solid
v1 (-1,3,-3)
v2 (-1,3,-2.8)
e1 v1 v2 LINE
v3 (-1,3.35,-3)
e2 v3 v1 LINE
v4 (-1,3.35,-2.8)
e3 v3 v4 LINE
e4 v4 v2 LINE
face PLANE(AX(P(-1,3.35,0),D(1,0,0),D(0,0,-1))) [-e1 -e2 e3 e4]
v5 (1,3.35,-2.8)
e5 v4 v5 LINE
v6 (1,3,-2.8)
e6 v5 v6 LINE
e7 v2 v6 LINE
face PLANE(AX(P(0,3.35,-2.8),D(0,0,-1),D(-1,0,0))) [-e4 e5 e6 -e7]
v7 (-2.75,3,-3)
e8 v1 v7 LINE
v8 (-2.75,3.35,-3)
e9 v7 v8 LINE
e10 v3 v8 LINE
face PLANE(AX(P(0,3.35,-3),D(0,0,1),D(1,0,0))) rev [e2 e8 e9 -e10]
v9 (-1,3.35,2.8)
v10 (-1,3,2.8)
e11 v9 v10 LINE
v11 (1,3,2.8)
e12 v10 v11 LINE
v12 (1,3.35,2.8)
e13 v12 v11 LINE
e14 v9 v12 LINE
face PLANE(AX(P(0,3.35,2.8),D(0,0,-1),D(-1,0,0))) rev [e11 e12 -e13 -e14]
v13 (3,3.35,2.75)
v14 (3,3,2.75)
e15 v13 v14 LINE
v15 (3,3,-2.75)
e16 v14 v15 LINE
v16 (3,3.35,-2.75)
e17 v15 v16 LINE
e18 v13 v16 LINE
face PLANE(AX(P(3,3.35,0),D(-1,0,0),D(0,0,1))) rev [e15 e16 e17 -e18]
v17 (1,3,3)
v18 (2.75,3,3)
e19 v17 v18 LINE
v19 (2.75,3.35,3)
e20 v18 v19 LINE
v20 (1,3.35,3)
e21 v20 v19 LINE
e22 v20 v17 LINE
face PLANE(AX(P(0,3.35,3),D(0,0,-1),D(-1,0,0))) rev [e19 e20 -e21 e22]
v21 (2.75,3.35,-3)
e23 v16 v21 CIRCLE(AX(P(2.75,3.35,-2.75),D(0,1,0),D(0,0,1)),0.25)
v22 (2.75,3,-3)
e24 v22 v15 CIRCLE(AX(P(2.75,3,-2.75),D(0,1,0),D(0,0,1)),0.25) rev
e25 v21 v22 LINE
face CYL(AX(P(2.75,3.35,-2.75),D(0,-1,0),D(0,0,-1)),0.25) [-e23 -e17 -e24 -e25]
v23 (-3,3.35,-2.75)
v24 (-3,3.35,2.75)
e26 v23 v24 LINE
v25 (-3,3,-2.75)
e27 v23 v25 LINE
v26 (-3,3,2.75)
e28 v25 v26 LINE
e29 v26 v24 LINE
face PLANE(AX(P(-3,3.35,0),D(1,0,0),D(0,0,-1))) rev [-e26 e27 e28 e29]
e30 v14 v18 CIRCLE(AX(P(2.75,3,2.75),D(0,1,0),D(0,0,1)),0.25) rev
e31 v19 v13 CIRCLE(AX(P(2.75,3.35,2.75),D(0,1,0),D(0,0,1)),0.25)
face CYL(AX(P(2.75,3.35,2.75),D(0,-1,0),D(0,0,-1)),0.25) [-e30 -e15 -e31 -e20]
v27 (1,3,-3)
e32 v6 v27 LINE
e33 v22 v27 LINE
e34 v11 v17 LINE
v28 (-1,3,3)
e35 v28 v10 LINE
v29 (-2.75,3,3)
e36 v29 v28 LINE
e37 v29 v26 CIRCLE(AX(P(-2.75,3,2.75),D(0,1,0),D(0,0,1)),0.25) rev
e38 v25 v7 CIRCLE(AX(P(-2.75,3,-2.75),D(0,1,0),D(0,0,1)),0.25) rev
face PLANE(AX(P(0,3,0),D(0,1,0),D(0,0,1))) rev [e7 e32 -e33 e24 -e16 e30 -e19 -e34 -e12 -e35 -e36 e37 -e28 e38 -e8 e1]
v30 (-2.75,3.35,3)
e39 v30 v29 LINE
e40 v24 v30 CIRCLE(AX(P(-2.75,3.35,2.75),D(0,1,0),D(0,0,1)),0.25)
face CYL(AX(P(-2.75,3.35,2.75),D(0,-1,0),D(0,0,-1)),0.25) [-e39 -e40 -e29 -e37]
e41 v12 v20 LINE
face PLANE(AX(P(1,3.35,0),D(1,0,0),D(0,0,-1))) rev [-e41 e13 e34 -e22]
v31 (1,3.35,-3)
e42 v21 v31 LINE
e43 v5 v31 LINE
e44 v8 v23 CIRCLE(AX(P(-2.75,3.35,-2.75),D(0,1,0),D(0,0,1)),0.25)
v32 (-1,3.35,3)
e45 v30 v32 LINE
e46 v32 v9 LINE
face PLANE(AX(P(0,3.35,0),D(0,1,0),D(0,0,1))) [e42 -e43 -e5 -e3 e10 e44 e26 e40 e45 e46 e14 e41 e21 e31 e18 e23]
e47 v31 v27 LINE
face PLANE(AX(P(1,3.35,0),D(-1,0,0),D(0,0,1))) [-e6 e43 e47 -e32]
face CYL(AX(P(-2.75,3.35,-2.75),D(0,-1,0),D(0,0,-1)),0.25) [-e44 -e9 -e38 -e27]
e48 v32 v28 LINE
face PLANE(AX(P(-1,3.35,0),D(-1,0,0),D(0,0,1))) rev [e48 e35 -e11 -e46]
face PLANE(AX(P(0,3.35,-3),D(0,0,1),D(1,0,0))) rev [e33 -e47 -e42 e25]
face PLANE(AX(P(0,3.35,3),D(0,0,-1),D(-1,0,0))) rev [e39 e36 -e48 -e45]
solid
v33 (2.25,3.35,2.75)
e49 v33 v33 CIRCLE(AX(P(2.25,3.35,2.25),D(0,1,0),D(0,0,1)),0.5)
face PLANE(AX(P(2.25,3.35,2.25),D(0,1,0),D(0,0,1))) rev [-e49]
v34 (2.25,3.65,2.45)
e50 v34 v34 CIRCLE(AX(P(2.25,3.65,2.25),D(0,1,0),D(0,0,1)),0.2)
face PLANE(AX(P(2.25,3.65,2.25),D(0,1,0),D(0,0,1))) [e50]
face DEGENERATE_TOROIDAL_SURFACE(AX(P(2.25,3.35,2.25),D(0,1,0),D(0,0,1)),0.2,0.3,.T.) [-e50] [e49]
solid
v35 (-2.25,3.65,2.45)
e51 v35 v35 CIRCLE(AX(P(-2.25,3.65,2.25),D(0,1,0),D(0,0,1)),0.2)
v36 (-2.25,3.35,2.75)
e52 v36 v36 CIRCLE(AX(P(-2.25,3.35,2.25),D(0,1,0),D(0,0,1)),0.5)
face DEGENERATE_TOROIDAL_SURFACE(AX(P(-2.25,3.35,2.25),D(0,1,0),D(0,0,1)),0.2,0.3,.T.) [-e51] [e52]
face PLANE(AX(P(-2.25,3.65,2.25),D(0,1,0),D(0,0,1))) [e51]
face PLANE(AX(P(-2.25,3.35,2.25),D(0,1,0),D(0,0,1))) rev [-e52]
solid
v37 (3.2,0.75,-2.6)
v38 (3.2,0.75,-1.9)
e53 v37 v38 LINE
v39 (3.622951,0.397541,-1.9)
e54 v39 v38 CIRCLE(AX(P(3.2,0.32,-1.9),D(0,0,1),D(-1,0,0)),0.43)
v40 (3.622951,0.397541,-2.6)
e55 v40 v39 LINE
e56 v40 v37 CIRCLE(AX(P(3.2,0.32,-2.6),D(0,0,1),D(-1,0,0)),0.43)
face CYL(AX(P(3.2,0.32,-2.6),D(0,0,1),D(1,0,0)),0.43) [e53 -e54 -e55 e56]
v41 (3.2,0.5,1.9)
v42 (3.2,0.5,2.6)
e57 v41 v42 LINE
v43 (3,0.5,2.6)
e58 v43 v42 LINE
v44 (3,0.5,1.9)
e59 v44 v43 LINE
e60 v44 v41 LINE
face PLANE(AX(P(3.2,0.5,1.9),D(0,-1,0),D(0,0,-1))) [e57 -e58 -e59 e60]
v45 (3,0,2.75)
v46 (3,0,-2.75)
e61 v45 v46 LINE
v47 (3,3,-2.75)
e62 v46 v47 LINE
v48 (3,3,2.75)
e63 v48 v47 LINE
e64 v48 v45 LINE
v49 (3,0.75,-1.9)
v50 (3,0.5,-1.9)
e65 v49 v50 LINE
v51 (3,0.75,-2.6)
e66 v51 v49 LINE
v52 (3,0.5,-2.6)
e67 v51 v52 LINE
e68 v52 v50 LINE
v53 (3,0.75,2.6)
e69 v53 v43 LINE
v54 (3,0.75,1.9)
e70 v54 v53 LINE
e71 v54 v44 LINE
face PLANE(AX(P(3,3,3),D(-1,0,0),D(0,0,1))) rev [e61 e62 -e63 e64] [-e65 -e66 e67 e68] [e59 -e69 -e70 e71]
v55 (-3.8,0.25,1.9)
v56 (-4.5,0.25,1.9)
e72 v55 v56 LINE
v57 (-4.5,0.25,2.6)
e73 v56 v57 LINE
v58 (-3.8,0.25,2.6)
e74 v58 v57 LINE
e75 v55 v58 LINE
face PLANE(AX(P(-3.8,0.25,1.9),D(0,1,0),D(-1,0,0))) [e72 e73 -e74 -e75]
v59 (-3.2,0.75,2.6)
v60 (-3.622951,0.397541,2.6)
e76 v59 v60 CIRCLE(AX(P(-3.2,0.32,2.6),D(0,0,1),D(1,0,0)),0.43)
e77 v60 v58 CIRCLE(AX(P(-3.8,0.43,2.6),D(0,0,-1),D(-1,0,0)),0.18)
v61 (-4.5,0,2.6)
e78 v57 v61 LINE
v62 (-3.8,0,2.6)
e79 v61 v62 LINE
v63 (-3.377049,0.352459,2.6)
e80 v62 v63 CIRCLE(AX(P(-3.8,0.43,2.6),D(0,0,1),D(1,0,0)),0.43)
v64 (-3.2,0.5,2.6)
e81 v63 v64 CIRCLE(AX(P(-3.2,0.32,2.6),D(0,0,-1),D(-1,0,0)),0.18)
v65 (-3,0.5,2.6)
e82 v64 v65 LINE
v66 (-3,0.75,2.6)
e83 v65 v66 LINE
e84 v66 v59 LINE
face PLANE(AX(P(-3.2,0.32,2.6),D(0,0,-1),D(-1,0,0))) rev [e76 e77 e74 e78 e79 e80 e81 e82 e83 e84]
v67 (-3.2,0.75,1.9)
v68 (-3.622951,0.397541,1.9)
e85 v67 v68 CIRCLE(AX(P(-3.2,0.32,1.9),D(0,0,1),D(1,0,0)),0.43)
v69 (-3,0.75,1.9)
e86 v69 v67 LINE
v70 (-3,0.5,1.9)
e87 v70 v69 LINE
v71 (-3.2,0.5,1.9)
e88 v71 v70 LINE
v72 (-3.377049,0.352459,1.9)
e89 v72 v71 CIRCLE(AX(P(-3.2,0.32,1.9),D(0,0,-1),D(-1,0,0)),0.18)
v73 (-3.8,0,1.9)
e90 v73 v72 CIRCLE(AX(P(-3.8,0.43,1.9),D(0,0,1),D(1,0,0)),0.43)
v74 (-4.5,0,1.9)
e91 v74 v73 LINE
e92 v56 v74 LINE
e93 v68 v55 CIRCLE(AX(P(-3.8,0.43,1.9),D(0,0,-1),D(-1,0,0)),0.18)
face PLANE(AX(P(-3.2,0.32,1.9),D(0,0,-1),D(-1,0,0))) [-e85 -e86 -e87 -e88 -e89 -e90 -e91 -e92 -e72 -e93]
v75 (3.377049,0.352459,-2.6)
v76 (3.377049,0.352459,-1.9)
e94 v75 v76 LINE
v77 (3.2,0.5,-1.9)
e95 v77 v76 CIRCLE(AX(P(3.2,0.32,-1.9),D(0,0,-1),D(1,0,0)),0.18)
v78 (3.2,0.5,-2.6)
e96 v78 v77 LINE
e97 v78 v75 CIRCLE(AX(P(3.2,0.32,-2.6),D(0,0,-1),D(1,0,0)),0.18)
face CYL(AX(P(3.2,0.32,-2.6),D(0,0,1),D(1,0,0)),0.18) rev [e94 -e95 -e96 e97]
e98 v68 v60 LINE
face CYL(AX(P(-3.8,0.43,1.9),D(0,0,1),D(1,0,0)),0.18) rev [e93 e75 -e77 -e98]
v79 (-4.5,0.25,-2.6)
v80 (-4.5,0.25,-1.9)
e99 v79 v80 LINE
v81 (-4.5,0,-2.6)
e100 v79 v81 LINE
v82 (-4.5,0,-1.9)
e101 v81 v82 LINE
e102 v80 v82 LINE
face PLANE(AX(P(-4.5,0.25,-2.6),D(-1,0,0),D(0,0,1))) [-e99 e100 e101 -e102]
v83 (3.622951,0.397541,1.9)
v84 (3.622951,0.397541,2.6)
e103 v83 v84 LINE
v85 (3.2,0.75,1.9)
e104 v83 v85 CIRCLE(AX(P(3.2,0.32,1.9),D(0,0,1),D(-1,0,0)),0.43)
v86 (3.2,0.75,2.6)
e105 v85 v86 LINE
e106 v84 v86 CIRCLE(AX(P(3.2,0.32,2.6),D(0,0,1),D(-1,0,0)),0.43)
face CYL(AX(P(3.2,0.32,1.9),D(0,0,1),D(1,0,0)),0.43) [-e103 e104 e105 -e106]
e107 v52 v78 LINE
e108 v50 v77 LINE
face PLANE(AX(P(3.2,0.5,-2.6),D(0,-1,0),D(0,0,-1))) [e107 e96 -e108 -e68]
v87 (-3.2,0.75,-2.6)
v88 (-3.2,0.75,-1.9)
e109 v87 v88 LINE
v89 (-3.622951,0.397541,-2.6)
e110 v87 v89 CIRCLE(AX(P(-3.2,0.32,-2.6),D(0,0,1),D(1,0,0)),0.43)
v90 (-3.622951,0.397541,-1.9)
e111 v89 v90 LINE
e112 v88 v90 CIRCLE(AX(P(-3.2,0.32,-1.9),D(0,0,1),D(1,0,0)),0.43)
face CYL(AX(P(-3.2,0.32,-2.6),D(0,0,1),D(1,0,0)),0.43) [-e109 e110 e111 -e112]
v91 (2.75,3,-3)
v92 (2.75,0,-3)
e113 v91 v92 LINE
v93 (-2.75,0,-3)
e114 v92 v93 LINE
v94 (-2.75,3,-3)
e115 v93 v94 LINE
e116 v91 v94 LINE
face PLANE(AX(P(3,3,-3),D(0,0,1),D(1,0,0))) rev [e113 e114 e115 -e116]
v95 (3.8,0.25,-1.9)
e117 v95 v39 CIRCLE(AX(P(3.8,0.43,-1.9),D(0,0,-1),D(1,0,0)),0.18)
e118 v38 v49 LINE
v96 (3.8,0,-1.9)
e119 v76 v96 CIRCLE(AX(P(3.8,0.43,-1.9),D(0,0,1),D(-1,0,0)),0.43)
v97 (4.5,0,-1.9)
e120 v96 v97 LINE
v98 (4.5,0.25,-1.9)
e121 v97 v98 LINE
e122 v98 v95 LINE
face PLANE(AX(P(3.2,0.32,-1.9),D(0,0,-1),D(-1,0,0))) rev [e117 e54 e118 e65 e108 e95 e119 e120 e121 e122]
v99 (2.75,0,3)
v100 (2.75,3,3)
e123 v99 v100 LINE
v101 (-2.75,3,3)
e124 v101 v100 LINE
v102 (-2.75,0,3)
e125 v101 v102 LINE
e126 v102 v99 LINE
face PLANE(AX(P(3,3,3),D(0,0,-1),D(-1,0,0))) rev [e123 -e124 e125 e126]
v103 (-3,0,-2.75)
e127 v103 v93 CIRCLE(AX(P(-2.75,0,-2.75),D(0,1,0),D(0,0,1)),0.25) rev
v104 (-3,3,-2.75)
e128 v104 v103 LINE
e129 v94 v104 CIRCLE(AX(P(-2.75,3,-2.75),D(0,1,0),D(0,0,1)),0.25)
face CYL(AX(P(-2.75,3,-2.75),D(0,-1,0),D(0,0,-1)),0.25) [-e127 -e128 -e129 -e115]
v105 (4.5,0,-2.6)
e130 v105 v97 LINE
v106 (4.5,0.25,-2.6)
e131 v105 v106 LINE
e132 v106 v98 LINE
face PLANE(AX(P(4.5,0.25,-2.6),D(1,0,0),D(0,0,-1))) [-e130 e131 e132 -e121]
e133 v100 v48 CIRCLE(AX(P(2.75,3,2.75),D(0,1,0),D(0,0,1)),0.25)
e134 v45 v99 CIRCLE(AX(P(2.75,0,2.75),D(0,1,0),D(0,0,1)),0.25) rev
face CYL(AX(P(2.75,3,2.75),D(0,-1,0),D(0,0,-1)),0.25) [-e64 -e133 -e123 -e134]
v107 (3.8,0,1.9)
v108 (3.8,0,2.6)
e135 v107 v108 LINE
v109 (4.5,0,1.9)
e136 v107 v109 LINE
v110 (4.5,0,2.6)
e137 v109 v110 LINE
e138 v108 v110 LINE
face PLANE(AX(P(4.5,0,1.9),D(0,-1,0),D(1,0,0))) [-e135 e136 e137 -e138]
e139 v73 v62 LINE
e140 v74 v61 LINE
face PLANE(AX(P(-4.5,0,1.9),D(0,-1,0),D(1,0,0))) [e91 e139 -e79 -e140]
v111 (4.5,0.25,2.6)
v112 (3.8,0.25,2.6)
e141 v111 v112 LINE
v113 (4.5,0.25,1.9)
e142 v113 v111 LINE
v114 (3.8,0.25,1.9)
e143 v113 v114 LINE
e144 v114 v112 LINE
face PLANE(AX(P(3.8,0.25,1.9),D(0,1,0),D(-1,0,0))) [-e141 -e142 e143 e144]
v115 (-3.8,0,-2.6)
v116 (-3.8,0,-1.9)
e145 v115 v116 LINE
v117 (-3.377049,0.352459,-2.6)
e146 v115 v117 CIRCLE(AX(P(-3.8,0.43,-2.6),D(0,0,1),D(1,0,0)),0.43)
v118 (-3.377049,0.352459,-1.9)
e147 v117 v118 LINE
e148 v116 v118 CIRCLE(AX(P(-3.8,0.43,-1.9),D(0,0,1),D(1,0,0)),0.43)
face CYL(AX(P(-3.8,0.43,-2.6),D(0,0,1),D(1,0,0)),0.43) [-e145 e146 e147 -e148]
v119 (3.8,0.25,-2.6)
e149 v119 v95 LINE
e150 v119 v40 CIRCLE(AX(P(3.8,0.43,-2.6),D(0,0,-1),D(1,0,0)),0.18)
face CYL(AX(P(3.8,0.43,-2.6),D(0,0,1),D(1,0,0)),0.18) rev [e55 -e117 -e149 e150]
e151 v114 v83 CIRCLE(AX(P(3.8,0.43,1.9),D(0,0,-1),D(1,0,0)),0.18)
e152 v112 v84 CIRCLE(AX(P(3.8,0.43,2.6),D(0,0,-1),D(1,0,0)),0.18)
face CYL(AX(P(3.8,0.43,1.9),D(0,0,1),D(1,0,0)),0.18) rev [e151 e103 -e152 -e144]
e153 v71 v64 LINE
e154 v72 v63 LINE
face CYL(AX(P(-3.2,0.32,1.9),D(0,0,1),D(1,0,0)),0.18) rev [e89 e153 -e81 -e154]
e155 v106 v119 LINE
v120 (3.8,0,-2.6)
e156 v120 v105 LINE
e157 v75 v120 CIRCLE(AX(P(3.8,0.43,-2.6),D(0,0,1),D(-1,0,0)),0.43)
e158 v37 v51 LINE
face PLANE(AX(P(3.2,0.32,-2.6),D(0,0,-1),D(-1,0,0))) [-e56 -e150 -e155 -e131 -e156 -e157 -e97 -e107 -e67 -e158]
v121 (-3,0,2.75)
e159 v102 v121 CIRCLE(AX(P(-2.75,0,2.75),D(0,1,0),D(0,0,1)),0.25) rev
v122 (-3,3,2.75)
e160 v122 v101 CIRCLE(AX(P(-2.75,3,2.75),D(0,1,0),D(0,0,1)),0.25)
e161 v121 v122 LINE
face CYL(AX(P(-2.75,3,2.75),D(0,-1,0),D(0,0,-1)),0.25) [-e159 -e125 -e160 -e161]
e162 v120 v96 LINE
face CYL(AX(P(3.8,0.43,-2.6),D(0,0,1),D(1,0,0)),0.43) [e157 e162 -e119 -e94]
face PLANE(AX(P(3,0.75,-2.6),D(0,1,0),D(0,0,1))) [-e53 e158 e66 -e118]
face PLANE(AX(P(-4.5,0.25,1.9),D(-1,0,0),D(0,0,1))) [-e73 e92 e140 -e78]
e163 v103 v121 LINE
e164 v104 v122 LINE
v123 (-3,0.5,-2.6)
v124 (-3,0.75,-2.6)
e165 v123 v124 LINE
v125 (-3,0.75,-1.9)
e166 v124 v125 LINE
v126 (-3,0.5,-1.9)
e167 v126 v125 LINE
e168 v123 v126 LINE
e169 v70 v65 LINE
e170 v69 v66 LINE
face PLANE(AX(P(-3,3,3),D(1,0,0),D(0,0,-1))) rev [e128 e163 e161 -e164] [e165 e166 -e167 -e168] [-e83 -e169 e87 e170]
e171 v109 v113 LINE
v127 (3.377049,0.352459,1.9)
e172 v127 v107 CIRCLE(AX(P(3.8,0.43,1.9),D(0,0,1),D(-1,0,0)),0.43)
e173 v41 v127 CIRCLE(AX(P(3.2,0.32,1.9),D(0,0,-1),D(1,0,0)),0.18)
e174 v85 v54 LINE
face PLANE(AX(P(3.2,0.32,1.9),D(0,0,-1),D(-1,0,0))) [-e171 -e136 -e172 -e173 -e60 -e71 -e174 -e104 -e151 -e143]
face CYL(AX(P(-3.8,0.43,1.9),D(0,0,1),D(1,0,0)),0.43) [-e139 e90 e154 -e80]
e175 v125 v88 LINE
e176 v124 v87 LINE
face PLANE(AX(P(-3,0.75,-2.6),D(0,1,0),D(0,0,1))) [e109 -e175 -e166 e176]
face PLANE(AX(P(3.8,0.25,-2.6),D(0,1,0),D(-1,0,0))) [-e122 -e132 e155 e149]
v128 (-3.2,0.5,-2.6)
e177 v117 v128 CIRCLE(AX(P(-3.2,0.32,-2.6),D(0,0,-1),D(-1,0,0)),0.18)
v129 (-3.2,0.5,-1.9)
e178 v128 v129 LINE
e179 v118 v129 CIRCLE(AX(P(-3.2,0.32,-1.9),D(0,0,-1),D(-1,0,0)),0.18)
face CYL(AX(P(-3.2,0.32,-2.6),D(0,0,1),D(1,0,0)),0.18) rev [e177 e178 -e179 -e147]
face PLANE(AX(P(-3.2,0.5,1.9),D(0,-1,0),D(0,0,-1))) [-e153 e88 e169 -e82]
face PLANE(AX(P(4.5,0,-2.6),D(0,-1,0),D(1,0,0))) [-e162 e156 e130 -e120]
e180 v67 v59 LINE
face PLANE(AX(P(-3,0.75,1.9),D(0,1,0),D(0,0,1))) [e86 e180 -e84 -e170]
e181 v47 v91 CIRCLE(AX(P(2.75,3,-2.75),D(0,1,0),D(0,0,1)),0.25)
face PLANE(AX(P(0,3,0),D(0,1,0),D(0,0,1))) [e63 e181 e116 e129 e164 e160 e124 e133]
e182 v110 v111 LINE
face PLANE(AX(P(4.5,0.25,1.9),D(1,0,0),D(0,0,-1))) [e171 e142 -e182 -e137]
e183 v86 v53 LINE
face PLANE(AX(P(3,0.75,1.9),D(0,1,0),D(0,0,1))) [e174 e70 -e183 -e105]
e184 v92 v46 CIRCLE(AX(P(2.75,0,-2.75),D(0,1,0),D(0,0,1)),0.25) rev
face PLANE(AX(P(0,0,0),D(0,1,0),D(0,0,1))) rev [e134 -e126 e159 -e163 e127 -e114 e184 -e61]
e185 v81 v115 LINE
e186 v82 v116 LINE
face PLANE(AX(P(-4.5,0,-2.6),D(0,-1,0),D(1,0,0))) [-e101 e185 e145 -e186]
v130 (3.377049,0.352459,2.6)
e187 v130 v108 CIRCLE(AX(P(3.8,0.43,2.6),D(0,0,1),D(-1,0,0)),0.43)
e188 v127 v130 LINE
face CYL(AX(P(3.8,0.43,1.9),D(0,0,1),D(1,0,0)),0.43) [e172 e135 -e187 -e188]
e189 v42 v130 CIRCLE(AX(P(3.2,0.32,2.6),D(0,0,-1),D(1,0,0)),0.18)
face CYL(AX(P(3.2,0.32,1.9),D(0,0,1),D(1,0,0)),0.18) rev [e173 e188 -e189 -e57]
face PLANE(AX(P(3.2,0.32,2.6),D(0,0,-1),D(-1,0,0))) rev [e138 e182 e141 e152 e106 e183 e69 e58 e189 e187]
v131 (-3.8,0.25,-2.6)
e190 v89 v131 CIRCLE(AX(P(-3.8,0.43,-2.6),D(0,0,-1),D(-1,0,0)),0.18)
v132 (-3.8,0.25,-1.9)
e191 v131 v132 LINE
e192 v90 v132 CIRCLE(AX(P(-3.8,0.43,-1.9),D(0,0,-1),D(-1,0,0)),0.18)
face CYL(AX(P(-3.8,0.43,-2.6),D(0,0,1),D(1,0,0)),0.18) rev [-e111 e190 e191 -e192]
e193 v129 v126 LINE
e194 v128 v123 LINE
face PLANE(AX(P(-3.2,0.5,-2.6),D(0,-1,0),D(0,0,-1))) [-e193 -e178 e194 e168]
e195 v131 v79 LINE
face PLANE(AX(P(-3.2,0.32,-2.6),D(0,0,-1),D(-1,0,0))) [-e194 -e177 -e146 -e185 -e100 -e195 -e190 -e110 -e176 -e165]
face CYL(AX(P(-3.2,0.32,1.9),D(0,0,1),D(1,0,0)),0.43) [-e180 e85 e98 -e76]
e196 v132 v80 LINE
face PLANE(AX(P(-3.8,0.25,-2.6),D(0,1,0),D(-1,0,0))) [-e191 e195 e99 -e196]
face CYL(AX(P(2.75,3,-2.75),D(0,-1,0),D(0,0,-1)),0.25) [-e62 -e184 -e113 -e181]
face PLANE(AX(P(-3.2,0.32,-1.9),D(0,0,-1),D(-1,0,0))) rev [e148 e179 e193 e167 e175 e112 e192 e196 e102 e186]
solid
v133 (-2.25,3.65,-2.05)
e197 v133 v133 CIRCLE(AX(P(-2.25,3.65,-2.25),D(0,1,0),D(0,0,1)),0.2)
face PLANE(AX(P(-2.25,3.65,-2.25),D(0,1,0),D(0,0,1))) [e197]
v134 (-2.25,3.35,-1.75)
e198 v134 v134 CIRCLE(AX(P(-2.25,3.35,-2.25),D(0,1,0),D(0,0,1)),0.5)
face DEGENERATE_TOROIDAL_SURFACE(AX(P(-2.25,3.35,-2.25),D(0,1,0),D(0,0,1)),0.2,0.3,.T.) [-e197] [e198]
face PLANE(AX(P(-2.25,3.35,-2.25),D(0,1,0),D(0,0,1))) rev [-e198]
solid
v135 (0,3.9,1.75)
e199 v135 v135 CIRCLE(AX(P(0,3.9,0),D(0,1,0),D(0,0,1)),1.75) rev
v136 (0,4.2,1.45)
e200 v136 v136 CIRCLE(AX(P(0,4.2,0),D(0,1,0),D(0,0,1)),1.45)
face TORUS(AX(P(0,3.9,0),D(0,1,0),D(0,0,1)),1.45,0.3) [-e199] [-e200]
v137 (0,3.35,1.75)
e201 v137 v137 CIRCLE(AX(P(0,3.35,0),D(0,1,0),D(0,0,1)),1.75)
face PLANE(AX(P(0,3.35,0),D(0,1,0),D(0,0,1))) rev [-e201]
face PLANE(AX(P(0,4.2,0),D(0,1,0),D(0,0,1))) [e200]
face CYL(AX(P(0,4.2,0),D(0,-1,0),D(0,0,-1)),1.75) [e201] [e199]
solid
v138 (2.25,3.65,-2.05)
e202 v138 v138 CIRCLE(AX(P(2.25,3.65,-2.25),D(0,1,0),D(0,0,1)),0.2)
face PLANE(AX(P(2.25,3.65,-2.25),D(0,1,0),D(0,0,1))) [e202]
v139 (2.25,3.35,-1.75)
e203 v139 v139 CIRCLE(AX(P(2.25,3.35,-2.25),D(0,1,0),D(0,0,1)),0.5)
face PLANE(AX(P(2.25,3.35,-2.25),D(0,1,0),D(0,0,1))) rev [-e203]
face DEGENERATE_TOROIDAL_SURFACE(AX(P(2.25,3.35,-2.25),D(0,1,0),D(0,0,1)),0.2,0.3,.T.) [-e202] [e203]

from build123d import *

# Parameters (mm, degrees)
SKETCH1_W             = 6
SKETCH1_H             = 6
BOSS_EXTRUDE1_DEPTH   = 3
BOSS_EXTRUDE4_DEPTH   = 0.35
SKETCH2_R             = 1.75
BOSS_EXTRUDE2_DEPTH   = 0.85
SKETCH3_R             = 0.5
BOSS_EXTRUDE3_DEPTH   = 0.3
BOSS_EXTRUDE3_2_DEPTH = 0.3
BOSS_EXTRUDE3_3_DEPTH = 0.3
BOSS_EXTRUDE3_4_DEPTH = 0.3
BOSS_EXTRUDE5_START   = -0.4
BOSS_EXTRUDE5_DEPTH   = 0.7
LPATTERN1_COUNT       = 2
LPATTERN1_PITCH       = 4.5
FILLET1_R             = 0.25
FILLET2_R             = 0.25
FILLET3_R             = 0.3
FILLET4_R             = 0.3
FILLET5_R             = 0.3
FILLET6_R             = 0.3
FILLET7_R             = 0.3


with BuildPart() as part:
    # Sketch1 → Boss-Extrude1 (new body)
    with BuildSketch(Plane(origin=(0, 0, 0), x_dir=(1, 0, 0), z_dir=(0, 1, 0))):
        Rectangle(SKETCH1_W, SKETCH1_H)
    extrude(amount=BOSS_EXTRUDE1_DEPTH)

    # Sketch5 → Boss-Extrude5 (add)
    with BuildSketch(Plane.XY.offset(3).offset(BOSS_EXTRUDE5_START)):
        with BuildLine():
            Line((3, 0.75), (3.2, 0.75))
            ThreePointArc((3.2, 0.75), (3.475279292, 0.65033515), (3.62295082, 0.397540984))
            ThreePointArc((3.62295082, 0.397540984), (3.684766808, 0.29172017), (3.8, 0.25))
            Line((3.8, 0.25), (4.5, 0.25))
            Line((4.5, 0.25), (4.5, 0))
            Line((4.5, 0), (3.8, 0))
            ThreePointArc((3.8, 0), (3.524720708, 0.09966485), (3.37704918, 0.352459016))
            ThreePointArc((3.37704918, 0.352459016), (3.315233192, 0.45827983), (3.2, 0.5))
            Line((3.2, 0.5), (3, 0.5))
            Line((3, 0.5), (3, 0.75))
        make_face()
        with BuildLine():
            Line((-3.2, 0.5), (-3, 0.5))
            Line((-3, 0.5), (-3, 0.75))
            Line((-3, 0.75), (-3.2, 0.75))
            ThreePointArc((-3.2, 0.75), (-3.475279292, 0.65033515), (-3.62295082, 0.397540984))
            ThreePointArc((-3.62295082, 0.397540984), (-3.684766808, 0.29172017), (-3.8, 0.25))
            Line((-3.8, 0.25), (-4.5, 0.25))
            Line((-4.5, 0.25), (-4.5, 0))
            Line((-4.5, 0), (-3.8, 0))
            ThreePointArc((-3.8, 0), (-3.524720708, 0.09966485), (-3.37704918, 0.352459016))
            ThreePointArc((-3.37704918, 0.352459016), (-3.315233192, 0.45827983), (-3.2, 0.5))
        make_face()
    boss_extrude5 = extrude(amount=-BOSS_EXTRUDE5_DEPTH)

    # LPattern1: Boss-Extrude5 ×2
    with Locations(*[(0, 0, -i * LPATTERN1_PITCH) for i in range(1, LPATTERN1_COUNT)]):
        add(boss_extrude5)

    # Fillet1
    fillet1_edges = [part.edges().sort_by_distance(p)[0] for p in [
        (-3, 1.5, -3),
        (3, 1.5, -3),
        (3, 1.5, 3),
        (-3, 1.5, 3),
    ]]
    fillet(fillet1_edges, radius=FILLET1_R)


with BuildPart() as body_2:
    # Sketch4 → Boss-Extrude4 (new body)
    with BuildSketch(Plane(origin=(0, 3, 0), x_dir=(1, 0, 0), z_dir=(0, 1, 0))):
        Polygon((-3, -3), (-1, -3), (-1, -2.8), (1, -2.8), (1, -3), (3, -3), (3, 3), (1, 3), (1, 2.8), (-1, 2.8), (-1, 3), (-3, 3), align=None)
    extrude(amount=BOSS_EXTRUDE4_DEPTH)

    # Fillet2
    fillet2_edges = [body_2.edges().sort_by_distance(p)[0] for p in [
        (3, 3.175, -3),
        (3, 3.175, 3),
        (-3, 3.175, 3),
        (-3, 3.175, -3),
    ]]
    fillet(fillet2_edges, radius=FILLET2_R)


with BuildPart() as body_3:
    # Sketch2 → Boss-Extrude2 (new body)
    with BuildSketch(Plane(origin=(0, 3.35, 0), x_dir=(1, 0, 0), z_dir=(0, 1, 0))):
        with Locations(Location((0, 0, 0), (0, 0, 270))):
            Circle(SKETCH2_R)
    extrude(amount=BOSS_EXTRUDE2_DEPTH)

    # Fillet7
    fillet7_edges = [body_3.edges().sort_by_distance(p)[0] for p in [
        (0, 4.2, -1.75),
    ]]
    fillet(fillet7_edges, radius=FILLET7_R)


with BuildPart() as body_4:
    # Sketch3 → Boss-Extrude3 (new body)
    with BuildSketch(Plane(origin=(0, 3.35, 0), x_dir=(1, 0, 0), z_dir=(0, 1, 0))):
        with Locations(Location((2.25, -2.25, 0), (0, 0, 270))):
            Circle(SKETCH3_R)
    extrude(amount=BOSS_EXTRUDE3_DEPTH)

    # Fillet3
    # the kernel refuses this fillet: 0.3 mm, written as the material it takes off along each edge
    with BuildSketch(Plane(origin=(2.25, 3.65, 2.25), x_dir=(0, 0, 1), z_dir=(-1, 0, 0))) as fillet3_piece_1:
        with BuildLine():
            CenterArc((0.5 - FILLET3_R, -FILLET3_R), FILLET3_R, 0, 90)
            Line((0.5 - FILLET3_R, 0), (0.5, 0))
            Line((0.5, 0), (0.5, -FILLET3_R))
        make_face()
    revolve(axis=Axis((2.25, 3.65, 2.25), (0, 1, 0)), mode=Mode.SUBTRACT)


with BuildPart() as body_5:
    # Sketch3 → Boss-Extrude3 2 (new body)
    with BuildSketch(Plane(origin=(0, 3.35, 0), x_dir=(1, 0, 0), z_dir=(0, 1, 0))):
        with Locations(Location((2.25, 2.25, 0), (0, 0, 270))):
            Circle(SKETCH3_R)
    extrude(amount=BOSS_EXTRUDE3_2_DEPTH)

    # Fillet6
    # the kernel refuses this fillet: 0.3 mm, written as the material it takes off along each edge
    with BuildSketch(Plane(origin=(2.25, 3.65, -2.25), x_dir=(0, 0, 1), z_dir=(-1, 0, 0))) as fillet6_piece_1:
        with BuildLine():
            CenterArc((0.5 - FILLET6_R, -FILLET6_R), FILLET6_R, 0, 90)
            Line((0.5 - FILLET6_R, 0), (0.5, 0))
            Line((0.5, 0), (0.5, -FILLET6_R))
        make_face()
    revolve(axis=Axis((2.25, 3.65, -2.25), (0, 1, 0)), mode=Mode.SUBTRACT)


with BuildPart() as body_6:
    # Sketch3 → Boss-Extrude3 3 (new body)
    with BuildSketch(Plane(origin=(0, 3.35, 0), x_dir=(1, 0, 0), z_dir=(0, 1, 0))):
        with Locations(Location((-2.25, 2.25, 0), (0, 0, 270))):
            Circle(SKETCH3_R)
    extrude(amount=BOSS_EXTRUDE3_3_DEPTH)

    # Fillet5
    # the kernel refuses this fillet: 0.3 mm, written as the material it takes off along each edge
    with BuildSketch(Plane(origin=(-2.25, 3.65, -2.25), x_dir=(0, 0, 1), z_dir=(-1, 0, 0))) as fillet5_piece_1:
        with BuildLine():
            CenterArc((0.5 - FILLET5_R, -FILLET5_R), FILLET5_R, 0, 90)
            Line((0.5 - FILLET5_R, 0), (0.5, 0))
            Line((0.5, 0), (0.5, -FILLET5_R))
        make_face()
    revolve(axis=Axis((-2.25, 3.65, -2.25), (0, 1, 0)), mode=Mode.SUBTRACT)


with BuildPart() as body_7:
    # Sketch3 → Boss-Extrude3 4 (new body)
    with BuildSketch(Plane(origin=(0, 3.35, 0), x_dir=(1, 0, 0), z_dir=(0, 1, 0))):
        with Locations(Location((-2.25, -2.25, 0), (0, 0, 270))):
            Circle(SKETCH3_R)
    extrude(amount=BOSS_EXTRUDE3_4_DEPTH)

    # Fillet4
    # the kernel refuses this fillet: 0.3 mm, written as the material it takes off along each edge
    with BuildSketch(Plane(origin=(-2.25, 3.65, 2.25), x_dir=(0, 0, 1), z_dir=(-1, 0, 0))) as fillet4_piece_1:
        with BuildLine():
            CenterArc((0.5 - FILLET4_R, -FILLET4_R), FILLET4_R, 0, 90)
            Line((0.5 - FILLET4_R, 0), (0.5, 0))
            Line((0.5, 0), (0.5, -FILLET4_R))
        make_face()
    revolve(axis=Axis((-2.25, 3.65, 2.25), (0, 1, 0)), mode=Mode.SUBTRACT)


solid = Compound([part.part, body_2.part, body_3.part, body_4.part, body_5.part, body_6.part, body_7.part])
